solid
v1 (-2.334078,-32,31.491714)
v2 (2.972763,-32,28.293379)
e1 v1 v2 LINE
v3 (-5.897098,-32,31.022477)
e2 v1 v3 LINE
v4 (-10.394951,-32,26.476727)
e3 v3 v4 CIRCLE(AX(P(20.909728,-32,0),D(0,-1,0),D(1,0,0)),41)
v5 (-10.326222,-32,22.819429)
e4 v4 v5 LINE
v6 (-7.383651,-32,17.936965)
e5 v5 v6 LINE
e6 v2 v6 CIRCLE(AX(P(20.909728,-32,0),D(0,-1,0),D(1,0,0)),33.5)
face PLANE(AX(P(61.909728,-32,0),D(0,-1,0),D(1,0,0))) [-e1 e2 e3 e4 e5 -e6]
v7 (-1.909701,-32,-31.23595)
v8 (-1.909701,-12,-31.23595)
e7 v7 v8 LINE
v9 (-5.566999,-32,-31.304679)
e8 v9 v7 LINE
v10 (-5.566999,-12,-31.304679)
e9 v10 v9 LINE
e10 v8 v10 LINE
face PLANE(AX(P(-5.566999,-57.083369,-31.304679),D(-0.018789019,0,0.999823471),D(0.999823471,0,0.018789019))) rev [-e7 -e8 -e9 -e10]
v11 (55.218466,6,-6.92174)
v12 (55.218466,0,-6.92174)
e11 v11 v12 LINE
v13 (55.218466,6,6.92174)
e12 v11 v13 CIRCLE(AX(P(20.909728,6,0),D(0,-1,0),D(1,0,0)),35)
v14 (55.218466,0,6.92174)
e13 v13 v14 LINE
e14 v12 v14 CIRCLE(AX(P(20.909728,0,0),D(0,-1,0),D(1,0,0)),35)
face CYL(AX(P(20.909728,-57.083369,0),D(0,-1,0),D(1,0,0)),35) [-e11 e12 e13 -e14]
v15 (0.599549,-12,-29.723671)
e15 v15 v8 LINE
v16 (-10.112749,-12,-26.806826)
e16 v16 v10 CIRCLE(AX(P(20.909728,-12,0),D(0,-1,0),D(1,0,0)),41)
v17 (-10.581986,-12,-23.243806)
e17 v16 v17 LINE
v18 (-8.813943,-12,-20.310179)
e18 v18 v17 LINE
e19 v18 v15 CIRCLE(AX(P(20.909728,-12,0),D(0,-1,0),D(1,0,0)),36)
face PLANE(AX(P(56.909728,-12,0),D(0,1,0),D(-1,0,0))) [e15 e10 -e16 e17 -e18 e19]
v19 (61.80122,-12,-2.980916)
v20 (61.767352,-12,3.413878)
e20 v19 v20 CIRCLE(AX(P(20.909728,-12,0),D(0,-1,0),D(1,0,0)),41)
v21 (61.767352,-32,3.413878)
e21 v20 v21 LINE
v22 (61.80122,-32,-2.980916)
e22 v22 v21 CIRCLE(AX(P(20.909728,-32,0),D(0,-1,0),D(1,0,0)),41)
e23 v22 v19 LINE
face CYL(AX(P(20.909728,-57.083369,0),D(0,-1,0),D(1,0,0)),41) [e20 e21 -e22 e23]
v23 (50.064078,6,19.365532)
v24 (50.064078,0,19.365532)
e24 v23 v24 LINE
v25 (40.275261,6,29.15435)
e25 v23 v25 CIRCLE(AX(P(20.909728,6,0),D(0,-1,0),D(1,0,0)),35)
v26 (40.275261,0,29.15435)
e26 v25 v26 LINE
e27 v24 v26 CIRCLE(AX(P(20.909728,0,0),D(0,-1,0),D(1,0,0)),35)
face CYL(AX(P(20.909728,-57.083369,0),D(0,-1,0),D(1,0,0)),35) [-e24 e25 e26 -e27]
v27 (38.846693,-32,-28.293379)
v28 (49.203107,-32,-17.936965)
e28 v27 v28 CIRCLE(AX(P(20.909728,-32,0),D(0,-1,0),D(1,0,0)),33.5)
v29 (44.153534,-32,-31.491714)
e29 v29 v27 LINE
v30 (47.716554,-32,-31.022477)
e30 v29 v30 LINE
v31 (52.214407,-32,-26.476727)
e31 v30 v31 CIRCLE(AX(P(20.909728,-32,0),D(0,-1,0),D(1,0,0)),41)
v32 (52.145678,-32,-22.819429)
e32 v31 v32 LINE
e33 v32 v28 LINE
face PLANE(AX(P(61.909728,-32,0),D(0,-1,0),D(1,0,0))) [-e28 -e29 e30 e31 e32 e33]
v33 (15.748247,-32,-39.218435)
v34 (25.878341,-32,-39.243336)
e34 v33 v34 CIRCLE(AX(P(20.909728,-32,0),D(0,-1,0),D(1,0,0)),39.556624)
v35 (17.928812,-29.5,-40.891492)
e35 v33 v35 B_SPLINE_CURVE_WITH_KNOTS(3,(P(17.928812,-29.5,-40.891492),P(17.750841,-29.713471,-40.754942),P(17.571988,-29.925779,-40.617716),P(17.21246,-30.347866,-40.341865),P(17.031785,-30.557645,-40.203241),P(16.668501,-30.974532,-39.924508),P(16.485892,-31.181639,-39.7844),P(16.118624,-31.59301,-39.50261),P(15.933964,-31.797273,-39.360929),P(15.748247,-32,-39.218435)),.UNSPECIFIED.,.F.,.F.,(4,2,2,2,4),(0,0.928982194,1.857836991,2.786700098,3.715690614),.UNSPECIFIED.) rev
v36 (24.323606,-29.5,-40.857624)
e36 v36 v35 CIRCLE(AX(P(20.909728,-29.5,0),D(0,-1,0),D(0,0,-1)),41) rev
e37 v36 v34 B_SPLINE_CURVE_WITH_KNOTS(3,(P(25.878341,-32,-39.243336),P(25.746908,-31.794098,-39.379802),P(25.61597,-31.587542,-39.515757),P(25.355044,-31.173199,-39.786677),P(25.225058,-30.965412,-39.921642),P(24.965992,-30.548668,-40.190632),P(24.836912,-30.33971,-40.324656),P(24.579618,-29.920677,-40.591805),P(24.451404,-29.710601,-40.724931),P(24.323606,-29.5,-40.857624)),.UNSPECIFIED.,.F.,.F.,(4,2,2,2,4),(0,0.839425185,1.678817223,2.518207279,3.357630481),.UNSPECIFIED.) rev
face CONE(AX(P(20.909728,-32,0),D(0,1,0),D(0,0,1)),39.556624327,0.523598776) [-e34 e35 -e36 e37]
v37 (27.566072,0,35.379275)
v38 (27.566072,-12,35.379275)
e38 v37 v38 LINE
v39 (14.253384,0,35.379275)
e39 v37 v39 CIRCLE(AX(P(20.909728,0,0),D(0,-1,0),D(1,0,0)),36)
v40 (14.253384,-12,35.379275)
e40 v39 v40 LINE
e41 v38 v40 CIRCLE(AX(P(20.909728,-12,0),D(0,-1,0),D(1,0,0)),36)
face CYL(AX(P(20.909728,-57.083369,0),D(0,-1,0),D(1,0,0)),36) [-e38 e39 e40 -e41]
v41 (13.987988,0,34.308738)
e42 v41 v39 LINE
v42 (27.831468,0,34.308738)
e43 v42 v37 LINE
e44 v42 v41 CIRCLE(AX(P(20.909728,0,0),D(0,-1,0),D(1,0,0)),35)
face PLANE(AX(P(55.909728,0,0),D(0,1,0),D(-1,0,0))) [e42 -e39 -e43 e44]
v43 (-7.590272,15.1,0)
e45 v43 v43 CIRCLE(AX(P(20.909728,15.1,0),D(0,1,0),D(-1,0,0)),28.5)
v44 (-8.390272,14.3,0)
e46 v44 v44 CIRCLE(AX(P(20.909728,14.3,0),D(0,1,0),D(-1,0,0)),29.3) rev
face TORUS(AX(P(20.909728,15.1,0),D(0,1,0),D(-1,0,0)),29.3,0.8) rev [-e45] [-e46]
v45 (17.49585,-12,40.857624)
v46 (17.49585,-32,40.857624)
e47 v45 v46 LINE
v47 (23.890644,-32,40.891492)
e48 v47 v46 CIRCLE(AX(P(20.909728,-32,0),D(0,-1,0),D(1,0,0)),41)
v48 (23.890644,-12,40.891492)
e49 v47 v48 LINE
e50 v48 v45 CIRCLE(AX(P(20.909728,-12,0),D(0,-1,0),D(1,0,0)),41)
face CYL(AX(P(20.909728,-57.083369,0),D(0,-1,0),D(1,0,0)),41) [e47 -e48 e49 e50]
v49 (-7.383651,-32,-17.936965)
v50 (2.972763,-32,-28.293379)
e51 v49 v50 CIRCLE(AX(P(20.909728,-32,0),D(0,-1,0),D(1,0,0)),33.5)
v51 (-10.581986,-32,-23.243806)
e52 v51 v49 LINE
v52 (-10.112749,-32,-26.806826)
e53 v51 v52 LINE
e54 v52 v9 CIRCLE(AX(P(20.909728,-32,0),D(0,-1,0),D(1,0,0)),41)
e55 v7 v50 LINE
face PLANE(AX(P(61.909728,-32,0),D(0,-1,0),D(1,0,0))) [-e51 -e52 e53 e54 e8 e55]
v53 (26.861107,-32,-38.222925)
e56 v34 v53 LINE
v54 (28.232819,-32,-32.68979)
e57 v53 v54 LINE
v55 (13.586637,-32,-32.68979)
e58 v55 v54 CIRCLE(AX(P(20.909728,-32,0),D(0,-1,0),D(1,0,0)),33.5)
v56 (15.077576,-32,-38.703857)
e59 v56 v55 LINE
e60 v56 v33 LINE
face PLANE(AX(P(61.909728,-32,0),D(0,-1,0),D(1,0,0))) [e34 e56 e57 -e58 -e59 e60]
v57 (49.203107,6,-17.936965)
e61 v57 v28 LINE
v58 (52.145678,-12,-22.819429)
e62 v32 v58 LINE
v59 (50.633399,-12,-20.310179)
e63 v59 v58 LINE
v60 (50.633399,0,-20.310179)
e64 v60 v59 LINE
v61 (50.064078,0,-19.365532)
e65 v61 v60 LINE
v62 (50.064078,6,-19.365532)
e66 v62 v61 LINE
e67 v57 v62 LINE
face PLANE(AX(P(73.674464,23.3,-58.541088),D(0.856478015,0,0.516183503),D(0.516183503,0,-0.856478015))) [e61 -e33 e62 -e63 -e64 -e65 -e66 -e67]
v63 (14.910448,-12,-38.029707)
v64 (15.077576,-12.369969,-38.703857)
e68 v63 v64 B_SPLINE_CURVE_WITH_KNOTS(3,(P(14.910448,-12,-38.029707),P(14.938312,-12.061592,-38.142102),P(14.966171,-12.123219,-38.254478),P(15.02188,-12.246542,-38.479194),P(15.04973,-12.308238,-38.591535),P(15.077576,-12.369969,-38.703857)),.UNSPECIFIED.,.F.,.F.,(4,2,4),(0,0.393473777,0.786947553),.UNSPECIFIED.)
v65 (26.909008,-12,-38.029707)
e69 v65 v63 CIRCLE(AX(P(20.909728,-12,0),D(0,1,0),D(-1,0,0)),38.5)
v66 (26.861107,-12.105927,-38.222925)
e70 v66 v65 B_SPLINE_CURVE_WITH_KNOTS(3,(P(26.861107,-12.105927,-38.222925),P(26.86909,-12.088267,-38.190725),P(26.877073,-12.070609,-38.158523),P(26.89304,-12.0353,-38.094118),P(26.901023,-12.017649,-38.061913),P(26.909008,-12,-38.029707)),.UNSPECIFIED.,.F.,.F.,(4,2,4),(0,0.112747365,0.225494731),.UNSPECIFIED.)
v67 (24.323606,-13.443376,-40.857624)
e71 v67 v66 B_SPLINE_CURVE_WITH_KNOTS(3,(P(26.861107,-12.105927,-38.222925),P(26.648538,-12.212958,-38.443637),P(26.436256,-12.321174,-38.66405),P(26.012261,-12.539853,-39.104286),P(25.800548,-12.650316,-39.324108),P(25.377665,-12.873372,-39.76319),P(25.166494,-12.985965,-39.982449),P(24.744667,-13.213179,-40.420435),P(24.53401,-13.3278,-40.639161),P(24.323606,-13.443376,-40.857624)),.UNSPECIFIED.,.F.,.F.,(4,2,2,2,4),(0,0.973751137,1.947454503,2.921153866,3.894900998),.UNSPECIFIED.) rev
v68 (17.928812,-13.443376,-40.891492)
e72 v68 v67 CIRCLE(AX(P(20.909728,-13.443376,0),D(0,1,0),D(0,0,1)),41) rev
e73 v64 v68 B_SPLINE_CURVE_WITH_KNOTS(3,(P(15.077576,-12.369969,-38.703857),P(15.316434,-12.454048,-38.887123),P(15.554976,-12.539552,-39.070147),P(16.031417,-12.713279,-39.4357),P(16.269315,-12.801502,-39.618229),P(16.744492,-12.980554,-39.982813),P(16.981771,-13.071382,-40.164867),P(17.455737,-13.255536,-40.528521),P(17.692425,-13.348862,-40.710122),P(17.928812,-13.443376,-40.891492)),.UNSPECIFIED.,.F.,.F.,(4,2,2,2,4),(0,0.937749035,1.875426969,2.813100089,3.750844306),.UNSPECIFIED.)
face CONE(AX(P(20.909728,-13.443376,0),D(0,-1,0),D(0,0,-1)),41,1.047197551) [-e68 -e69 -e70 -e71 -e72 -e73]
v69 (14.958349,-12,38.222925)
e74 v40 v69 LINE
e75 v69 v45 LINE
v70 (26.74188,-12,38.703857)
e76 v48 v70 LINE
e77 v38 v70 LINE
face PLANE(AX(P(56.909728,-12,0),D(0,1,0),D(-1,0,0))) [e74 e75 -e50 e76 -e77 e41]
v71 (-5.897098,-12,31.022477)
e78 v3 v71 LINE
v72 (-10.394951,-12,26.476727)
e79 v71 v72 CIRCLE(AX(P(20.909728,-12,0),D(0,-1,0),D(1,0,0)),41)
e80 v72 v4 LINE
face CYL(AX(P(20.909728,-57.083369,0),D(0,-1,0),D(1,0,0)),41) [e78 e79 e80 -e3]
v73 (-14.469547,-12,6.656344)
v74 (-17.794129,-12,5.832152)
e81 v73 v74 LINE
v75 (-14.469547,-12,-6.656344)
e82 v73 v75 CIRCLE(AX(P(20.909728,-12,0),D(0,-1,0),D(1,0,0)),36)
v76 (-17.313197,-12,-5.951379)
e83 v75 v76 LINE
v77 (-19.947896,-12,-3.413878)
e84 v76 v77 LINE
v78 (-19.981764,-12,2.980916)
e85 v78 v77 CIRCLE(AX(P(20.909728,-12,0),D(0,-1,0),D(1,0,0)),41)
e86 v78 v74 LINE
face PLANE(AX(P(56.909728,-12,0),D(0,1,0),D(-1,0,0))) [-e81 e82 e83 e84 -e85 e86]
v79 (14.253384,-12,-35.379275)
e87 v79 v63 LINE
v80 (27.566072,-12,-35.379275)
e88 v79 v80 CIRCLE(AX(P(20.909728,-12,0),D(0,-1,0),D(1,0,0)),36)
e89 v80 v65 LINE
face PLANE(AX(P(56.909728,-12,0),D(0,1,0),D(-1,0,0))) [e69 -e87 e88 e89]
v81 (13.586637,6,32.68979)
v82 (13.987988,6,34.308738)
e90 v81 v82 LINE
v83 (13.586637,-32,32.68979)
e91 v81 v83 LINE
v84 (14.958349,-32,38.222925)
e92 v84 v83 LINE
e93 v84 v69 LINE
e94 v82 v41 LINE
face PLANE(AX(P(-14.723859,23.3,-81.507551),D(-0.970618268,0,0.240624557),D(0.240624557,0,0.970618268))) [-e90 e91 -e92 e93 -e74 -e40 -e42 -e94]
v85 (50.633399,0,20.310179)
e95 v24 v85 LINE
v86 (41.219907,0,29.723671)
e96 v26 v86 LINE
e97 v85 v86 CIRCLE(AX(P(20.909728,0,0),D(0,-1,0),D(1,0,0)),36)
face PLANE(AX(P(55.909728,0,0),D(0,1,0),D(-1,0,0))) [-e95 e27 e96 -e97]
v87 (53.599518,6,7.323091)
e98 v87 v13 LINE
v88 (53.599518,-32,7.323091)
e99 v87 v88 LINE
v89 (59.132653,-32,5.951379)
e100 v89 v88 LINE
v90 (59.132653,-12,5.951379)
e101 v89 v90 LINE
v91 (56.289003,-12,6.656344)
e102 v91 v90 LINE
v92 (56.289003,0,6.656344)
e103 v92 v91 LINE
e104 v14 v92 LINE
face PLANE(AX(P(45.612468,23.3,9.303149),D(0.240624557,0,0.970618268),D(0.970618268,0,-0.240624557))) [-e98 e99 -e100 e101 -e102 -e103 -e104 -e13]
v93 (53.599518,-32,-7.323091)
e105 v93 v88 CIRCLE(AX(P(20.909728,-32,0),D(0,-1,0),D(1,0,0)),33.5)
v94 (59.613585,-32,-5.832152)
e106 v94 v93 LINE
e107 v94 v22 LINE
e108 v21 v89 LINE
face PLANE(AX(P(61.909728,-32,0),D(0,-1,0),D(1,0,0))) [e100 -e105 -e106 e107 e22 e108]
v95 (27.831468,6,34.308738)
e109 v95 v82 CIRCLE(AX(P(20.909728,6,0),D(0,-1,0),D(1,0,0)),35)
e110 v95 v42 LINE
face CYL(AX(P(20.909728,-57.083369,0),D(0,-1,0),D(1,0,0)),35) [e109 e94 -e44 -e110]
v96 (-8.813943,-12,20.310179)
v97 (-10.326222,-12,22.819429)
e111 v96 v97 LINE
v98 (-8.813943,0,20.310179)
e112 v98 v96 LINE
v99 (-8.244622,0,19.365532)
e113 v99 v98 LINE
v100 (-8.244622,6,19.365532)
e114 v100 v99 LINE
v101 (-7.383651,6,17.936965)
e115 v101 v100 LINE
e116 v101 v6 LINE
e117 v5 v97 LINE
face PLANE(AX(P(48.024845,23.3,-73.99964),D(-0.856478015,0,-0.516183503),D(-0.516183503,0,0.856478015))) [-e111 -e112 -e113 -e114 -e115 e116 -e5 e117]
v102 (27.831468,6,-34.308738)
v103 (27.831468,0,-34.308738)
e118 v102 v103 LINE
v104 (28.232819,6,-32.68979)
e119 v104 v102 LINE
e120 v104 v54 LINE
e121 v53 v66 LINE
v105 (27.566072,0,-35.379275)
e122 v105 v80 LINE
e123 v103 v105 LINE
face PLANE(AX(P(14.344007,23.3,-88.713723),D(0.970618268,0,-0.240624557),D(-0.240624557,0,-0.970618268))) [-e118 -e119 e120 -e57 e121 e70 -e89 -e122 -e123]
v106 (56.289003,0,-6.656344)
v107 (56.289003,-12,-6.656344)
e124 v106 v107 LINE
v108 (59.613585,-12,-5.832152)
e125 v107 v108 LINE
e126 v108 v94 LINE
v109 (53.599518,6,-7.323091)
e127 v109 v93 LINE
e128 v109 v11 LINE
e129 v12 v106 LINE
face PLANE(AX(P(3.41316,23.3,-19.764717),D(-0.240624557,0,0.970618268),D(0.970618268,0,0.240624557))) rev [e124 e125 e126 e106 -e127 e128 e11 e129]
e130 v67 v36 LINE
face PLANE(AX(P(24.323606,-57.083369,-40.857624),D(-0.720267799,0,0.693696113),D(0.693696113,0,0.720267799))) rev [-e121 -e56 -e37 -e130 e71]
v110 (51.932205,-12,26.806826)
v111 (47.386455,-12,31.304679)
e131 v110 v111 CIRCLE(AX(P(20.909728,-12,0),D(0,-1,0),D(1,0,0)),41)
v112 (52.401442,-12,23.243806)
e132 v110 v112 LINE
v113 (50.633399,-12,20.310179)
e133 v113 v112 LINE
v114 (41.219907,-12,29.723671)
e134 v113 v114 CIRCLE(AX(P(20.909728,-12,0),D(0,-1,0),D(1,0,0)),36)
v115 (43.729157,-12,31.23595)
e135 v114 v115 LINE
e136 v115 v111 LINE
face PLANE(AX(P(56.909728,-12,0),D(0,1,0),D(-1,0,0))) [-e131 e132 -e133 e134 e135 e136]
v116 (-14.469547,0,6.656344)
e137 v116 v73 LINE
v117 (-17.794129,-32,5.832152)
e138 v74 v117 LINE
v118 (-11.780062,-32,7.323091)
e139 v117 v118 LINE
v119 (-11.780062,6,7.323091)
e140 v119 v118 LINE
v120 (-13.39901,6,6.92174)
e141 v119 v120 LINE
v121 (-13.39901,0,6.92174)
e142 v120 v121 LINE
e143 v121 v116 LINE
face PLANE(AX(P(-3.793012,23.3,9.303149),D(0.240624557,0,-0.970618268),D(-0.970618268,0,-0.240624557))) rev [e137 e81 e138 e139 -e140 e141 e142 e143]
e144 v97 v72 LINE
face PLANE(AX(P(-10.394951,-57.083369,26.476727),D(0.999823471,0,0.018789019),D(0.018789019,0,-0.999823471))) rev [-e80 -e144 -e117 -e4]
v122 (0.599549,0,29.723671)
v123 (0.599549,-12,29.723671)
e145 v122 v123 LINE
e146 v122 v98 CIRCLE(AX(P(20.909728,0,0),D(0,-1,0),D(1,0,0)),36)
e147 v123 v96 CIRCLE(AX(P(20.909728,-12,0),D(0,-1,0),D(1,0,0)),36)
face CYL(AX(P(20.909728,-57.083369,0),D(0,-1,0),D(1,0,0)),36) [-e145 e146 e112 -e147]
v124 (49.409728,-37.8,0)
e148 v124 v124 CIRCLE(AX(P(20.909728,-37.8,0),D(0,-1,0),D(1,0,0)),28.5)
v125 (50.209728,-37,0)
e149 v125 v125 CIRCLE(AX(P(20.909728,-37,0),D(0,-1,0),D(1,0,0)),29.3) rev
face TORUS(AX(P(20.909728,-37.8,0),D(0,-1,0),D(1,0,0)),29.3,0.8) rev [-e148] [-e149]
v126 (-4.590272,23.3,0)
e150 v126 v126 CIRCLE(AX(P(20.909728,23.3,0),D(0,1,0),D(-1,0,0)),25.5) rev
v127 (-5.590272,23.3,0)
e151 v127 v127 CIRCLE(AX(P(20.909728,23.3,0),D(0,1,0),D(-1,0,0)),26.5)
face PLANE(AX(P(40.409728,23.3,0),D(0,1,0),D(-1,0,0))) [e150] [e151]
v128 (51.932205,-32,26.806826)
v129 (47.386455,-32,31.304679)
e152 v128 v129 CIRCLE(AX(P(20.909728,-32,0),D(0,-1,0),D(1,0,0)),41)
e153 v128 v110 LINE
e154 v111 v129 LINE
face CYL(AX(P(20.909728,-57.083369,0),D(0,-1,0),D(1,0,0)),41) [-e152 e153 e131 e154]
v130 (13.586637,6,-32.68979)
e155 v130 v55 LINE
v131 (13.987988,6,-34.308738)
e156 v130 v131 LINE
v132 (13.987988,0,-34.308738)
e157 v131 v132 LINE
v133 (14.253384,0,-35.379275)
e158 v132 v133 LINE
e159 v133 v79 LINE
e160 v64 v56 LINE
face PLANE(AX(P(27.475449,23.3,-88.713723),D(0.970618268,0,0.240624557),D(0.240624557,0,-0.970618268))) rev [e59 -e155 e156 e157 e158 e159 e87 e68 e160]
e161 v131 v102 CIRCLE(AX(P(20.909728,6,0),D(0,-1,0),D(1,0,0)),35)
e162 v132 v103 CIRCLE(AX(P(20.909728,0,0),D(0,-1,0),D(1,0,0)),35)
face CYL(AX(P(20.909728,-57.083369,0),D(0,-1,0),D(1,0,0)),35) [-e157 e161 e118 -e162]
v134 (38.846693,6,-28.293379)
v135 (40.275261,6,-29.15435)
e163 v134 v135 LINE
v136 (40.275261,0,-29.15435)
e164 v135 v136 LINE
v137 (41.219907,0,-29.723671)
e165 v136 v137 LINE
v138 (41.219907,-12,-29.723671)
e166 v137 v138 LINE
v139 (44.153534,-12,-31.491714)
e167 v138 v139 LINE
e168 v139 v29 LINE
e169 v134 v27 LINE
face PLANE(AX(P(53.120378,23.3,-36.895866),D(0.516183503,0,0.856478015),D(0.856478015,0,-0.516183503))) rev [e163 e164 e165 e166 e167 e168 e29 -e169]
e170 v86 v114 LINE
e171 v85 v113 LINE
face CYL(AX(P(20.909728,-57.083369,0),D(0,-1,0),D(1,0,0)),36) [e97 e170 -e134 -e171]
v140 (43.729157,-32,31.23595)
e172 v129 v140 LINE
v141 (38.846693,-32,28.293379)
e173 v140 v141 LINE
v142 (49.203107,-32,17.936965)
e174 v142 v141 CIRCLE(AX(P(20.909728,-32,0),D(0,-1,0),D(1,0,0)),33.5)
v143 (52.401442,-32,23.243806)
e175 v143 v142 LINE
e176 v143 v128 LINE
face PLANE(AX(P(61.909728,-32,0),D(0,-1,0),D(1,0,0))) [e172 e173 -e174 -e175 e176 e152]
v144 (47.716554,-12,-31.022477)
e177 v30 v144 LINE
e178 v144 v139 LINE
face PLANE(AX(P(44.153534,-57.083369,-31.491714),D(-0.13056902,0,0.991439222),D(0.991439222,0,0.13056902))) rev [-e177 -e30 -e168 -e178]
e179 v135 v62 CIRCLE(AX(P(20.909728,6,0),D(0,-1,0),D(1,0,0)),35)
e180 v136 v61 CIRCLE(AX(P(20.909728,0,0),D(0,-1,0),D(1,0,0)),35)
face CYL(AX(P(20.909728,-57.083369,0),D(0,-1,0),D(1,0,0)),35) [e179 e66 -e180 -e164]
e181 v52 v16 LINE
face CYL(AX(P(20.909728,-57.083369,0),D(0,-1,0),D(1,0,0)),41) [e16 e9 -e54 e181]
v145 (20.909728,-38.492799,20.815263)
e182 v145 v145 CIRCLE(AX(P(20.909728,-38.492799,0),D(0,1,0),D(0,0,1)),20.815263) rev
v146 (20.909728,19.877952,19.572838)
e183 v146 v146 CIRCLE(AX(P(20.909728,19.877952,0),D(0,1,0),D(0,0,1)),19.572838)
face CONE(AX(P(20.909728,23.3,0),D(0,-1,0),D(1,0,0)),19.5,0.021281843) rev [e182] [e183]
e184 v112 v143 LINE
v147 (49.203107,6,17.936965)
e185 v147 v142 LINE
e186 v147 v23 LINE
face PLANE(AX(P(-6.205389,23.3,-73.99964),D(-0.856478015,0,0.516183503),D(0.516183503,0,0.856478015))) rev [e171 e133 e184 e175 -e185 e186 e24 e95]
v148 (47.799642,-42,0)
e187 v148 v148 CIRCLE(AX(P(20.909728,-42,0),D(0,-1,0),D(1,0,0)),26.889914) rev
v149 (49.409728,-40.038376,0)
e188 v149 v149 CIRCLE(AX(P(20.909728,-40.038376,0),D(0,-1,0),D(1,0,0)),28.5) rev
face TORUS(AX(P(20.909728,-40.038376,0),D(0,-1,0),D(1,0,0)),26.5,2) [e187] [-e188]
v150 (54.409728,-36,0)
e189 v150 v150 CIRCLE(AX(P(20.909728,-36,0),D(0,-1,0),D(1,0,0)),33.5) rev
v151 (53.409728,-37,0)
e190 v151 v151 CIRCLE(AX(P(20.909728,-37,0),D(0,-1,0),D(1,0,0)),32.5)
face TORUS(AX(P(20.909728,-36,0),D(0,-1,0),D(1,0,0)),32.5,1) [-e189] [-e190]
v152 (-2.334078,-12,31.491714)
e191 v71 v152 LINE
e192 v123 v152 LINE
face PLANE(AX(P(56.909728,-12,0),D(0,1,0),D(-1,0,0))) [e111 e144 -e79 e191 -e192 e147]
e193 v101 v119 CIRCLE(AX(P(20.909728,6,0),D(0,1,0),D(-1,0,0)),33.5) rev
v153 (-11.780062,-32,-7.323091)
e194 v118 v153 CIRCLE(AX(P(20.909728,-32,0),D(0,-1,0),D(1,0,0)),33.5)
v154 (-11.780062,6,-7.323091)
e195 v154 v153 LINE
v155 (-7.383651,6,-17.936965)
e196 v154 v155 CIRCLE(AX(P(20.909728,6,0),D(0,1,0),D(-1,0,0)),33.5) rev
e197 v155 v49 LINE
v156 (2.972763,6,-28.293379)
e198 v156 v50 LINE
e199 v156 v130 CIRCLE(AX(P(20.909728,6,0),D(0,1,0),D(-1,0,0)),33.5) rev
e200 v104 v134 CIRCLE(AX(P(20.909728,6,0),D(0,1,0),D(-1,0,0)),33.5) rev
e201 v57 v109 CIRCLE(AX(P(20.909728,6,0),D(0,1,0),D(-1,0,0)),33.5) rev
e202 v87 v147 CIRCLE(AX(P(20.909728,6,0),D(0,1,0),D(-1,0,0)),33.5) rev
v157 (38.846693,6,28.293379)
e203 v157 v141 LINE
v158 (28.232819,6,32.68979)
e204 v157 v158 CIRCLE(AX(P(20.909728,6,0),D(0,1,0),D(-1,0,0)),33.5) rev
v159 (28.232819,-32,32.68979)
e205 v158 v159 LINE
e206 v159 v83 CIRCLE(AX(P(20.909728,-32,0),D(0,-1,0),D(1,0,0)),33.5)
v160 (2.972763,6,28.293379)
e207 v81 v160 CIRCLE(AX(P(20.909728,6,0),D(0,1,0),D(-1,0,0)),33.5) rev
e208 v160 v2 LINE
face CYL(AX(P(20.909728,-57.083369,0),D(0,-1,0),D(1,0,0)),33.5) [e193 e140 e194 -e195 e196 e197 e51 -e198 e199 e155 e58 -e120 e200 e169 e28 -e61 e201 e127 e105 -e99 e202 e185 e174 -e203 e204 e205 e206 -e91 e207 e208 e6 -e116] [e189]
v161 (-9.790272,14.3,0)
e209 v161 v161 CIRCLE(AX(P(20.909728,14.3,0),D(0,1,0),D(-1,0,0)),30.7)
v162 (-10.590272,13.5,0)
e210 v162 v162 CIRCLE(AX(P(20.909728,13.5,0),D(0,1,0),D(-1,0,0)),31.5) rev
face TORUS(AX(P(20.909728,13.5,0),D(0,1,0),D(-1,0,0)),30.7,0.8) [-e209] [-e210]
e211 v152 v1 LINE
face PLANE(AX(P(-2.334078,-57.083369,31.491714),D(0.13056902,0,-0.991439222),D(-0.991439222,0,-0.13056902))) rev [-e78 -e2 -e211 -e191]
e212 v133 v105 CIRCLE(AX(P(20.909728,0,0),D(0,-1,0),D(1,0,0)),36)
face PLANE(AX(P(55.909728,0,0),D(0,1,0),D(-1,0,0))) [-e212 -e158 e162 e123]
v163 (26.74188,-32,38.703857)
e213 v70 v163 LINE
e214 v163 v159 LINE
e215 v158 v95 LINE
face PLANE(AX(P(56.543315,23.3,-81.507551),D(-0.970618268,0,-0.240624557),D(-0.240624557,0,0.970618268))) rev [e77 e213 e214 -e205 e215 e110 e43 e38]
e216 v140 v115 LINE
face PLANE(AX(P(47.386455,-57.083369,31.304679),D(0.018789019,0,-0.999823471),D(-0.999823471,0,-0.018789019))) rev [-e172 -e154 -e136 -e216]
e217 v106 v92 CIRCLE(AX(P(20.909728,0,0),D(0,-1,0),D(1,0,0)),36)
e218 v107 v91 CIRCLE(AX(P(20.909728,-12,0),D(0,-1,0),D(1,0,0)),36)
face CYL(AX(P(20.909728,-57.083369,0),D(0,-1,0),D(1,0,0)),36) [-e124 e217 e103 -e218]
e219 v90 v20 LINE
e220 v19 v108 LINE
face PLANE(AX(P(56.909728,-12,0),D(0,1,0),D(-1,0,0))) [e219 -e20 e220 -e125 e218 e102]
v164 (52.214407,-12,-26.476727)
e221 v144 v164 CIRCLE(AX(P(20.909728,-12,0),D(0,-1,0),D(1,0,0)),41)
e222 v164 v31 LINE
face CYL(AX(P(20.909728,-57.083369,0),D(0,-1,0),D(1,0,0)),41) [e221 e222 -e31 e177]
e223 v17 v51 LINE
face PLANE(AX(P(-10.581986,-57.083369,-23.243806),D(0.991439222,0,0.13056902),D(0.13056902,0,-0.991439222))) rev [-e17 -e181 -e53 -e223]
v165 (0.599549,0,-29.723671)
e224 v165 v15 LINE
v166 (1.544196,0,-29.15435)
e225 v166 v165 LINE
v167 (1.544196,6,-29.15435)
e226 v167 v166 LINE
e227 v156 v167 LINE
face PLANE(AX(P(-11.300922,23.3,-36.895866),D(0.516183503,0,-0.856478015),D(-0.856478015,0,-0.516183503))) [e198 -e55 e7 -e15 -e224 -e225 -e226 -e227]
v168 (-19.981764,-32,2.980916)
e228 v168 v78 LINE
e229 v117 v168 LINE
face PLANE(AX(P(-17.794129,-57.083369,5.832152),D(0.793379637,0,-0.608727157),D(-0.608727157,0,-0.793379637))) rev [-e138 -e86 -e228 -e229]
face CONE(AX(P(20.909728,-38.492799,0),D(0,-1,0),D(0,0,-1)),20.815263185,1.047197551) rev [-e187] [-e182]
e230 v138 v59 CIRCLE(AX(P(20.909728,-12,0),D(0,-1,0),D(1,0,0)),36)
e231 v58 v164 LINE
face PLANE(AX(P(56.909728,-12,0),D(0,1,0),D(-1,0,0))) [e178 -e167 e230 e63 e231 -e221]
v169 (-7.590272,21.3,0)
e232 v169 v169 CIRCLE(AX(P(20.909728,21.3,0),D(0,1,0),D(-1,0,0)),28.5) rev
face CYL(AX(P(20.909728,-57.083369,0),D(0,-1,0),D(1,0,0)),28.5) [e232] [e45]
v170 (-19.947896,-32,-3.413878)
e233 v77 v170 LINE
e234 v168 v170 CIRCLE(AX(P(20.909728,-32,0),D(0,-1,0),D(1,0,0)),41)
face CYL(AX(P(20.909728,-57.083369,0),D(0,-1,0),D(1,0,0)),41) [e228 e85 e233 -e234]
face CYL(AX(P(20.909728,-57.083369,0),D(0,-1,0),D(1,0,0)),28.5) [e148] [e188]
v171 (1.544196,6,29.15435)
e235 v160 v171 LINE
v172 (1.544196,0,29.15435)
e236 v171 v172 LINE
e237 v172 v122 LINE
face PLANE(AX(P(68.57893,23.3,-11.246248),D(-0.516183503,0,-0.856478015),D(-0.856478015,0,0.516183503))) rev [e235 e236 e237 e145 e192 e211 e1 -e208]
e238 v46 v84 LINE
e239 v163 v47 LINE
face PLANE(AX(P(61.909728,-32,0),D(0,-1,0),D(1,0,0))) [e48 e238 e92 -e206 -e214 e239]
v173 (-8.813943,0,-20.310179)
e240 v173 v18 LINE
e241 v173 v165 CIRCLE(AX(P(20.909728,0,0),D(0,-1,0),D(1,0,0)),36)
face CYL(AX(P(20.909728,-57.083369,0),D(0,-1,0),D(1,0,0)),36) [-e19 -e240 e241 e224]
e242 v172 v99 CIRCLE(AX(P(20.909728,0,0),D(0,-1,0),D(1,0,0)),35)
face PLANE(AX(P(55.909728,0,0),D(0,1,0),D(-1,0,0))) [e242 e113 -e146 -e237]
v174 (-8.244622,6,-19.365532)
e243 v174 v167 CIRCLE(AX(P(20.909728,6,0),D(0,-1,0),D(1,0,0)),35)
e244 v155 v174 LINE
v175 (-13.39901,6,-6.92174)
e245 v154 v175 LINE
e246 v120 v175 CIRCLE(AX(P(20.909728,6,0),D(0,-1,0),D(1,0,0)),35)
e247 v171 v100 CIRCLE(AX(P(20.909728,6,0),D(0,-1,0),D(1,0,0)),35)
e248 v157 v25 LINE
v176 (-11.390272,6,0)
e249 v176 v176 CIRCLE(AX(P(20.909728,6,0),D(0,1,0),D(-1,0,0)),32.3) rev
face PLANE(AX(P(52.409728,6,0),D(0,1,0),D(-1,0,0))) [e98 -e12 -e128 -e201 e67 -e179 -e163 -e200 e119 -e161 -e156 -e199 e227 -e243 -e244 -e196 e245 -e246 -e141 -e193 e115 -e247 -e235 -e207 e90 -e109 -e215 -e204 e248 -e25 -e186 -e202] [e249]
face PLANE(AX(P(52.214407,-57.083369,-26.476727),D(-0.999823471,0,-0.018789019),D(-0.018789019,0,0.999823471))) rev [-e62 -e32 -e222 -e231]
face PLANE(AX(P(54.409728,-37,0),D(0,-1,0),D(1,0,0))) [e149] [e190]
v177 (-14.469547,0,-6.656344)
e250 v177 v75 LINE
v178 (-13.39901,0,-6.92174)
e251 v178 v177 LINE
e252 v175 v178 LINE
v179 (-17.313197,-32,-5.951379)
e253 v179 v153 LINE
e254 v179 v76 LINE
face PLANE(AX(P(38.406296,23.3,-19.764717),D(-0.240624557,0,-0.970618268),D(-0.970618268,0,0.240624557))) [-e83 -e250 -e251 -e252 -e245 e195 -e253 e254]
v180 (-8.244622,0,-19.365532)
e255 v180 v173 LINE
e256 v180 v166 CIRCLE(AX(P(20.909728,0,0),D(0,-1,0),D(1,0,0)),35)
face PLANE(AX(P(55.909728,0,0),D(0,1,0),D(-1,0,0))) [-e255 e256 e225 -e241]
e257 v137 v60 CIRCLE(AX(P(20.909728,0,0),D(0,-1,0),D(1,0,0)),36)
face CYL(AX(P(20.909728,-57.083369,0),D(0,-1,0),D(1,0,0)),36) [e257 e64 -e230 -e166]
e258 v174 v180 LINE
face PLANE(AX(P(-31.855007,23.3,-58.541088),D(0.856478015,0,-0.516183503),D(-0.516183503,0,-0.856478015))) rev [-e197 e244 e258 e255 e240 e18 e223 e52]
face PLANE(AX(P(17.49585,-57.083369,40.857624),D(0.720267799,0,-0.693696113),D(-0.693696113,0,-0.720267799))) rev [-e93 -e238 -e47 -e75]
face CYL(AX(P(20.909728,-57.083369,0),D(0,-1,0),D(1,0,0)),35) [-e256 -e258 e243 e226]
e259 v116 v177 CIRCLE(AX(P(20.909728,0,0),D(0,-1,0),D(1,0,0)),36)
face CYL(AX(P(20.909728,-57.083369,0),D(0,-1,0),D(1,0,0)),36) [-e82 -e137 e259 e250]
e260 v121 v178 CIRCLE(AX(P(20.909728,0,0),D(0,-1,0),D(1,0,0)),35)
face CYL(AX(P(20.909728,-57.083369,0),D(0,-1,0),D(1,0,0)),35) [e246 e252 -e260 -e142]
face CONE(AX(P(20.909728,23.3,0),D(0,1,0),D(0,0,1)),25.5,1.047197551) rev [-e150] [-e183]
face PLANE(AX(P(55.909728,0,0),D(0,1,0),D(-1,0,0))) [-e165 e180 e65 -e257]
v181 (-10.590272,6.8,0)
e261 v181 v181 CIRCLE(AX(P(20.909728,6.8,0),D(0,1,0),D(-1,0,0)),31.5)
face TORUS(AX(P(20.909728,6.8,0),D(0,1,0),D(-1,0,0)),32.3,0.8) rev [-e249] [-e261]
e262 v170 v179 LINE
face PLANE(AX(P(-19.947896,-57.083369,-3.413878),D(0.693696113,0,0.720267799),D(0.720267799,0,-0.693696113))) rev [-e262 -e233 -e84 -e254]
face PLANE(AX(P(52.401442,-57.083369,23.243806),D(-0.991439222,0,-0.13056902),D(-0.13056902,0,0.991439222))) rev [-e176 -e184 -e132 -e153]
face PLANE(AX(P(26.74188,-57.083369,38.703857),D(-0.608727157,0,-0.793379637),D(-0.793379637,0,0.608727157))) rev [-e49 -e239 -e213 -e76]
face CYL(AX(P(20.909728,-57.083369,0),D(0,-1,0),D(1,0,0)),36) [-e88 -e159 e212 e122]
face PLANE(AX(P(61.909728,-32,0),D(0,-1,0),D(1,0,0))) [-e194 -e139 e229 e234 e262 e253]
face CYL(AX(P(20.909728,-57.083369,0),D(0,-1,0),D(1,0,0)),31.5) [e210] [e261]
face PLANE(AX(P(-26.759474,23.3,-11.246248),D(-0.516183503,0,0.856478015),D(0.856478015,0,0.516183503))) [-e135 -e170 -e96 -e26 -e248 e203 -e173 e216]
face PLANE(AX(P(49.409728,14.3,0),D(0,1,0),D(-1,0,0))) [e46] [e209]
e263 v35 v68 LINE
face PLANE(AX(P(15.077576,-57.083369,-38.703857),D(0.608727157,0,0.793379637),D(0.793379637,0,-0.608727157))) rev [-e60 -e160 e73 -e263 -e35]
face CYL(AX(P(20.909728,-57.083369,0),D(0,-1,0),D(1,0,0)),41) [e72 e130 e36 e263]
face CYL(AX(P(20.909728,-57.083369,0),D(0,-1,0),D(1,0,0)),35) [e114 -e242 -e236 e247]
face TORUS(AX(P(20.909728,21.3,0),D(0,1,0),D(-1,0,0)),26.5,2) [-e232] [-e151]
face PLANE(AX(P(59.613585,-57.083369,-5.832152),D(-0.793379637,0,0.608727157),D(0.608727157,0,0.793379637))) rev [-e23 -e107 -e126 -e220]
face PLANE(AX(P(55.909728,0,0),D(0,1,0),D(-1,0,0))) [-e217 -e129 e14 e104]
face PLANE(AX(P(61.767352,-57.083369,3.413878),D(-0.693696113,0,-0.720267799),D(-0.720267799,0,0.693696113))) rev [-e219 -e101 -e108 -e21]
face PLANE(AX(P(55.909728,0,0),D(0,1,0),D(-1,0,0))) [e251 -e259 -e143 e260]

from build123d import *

# Parameters (mm, degrees)
CORTE_EXTRUS_O3_DEPTH = 93.584579839
CHANFRO1_SIZE         = 2.5
CHANFRO1_SIZE_2       = 1.443375673
CHANFRO1_SIZE_3       = 2.004509131
CHANFRO2_SIZE         = 6
CHANFRO2_SIZE2        = 3.422823391
CHANFRO3_SIZE         = 6
CHANFRO3_SIZE2        = 3.507995763
FILETE2_R             = 2
FILETE3_R             = 2
FILETE4_R             = 1
FILETE5_R             = 0.8
FILETE6_R             = 0.8


with BuildPart() as part:
    # Esboço1 → Revolução1 (revolve)
    with BuildSketch(Plane.XY):
        Polygon((40.409728023, 23.3), (49.409728023, 23.3), (49.409728023, 14.3), (52.409728023, 14.3), (52.409728023, 6), (55.909728023, 6), (55.909728023, 0), (56.909728023, 0), (56.909728023, -12), (61.909728023, -12), (61.909728023, -32), (54.409728023, -32), (54.409728023, -37), (49.409728023, -37), (49.409728023, -42), (41.799642187, -42), align=None)
    revolve(axis=Axis((20.909728023, -57.083369099, 0), (0, 1, 0)))

    # Esboço2 → Corte-extrusão3 (cut, through all)
    with BuildSketch(Plane.XZ.offset(32)):
        with BuildLine():
            ThreePointArc((-11.616680712, 24.960623686), (-16.96933281, 15.690020727), (-19.739742432, 5.349817913))
            Line((-19.739742432, 5.349817913), (-11.780061536, 7.323090779))
            ThreePointArc((-11.780061536, 7.323090779), (-10.040236316, 12.819894984), (-7.383650999, 17.936964724))
            Line((-7.383650999, 17.936964724), (-11.616680712, 24.960623686))
        make_face()
        with BuildLine():
            ThreePointArc((15.55991011, 40.649470455), (5.219707296, 37.879060833), (-4.050895663, 32.526408735))
            Line((-4.050895663, 32.526408735), (2.972763299, 28.293379022))
            ThreePointArc((2.972763299, 28.293379022), (8.089833039, 30.949964339), (13.586637245, 32.68978956))
            Line((13.586637245, 32.68978956), (15.55991011, 40.649470455))
        make_face()
        with BuildLine():
            ThreePointArc((45.870351709, 32.526408735), (36.59974875, 37.879060833), (26.259545937, 40.649470455))
            Line((26.259545937, 40.649470455), (28.232818802, 32.68978956))
            ThreePointArc((28.232818802, 32.68978956), (33.729623008, 30.949964339), (38.846692748, 28.293379022))
            Line((38.846692748, 28.293379022), (45.870351709, 32.526408735))
        make_face()
        with BuildLine():
            ThreePointArc((61.559198479, 5.349817913), (58.788788856, 15.690020727), (53.436136759, 24.960623686))
            Line((53.436136759, 24.960623686), (49.203107045, 17.936964724))
            ThreePointArc((49.203107045, 17.936964724), (51.859692363, 12.819894984), (53.599517583, 7.323090779))
            Line((53.599517583, 7.323090779), (61.559198479, 5.349817913))
        make_face()
        with BuildLine():
            Line((49.203107045, -17.936964724), (53.436136759, -24.960623686))
            ThreePointArc((53.436136759, -24.960623686), (58.788788856, -15.690020727), (61.559198479, -5.349817913))
            Line((61.559198479, -5.349817913), (53.599517583, -7.323090779))
            ThreePointArc((53.599517583, -7.323090779), (51.859692363, -12.819894984), (49.203107045, -17.936964724))
        make_face()
        with BuildLine():
            Line((28.232818802, -32.68978956), (26.259545937, -40.649470455))
            ThreePointArc((26.259545937, -40.649470455), (36.59974875, -37.879060833), (45.870351709, -32.526408735))
            Line((45.870351709, -32.526408735), (38.846692748, -28.293379022))
            ThreePointArc((38.846692748, -28.293379022), (33.729623008, -30.949964339), (28.232818802, -32.68978956))
        make_face()
        with BuildLine():
            Line((2.972763299, -28.293379022), (-4.050895663, -32.526408735))
            ThreePointArc((-4.050895663, -32.526408735), (5.219707296, -37.879060833), (15.55991011, -40.649470455))
            Line((15.55991011, -40.649470455), (13.586637245, -32.68978956))
            ThreePointArc((13.586637245, -32.68978956), (8.089833039, -30.949964339), (2.972763299, -28.293379022))
        make_face()
        with BuildLine():
            Line((-11.780061536, -7.323090779), (-19.739742432, -5.349817913))
            ThreePointArc((-19.739742432, -5.349817913), (-16.96933281, -15.690020727), (-11.616680712, -24.960623686))
            Line((-11.616680712, -24.960623686), (-7.383650999, -17.936964724))
            ThreePointArc((-7.383650999, -17.936964724), (-10.040236316, -12.819894984), (-11.780061536, -7.323090779))
        make_face()
    extrude(amount=-CORTE_EXTRUS_O3_DEPTH, mode=Mode.SUBTRACT)

    # Chanfro1
    # the kernel refuses this chamfer: 2.5, 2.004509131, 1.443375673 mm, written as the material it takes off along each edge
    with BuildSketch(Plane(origin=(20.909728023, -32, 0), x_dir=(0.284617484383171, 0, -0.9586411672692736), z_dir=(0.9586411672692736, 0, 0.284617484383171))) as chanfro1_piece_1:
        Polygon((41, CHANFRO1_SIZE), (41 - CHANFRO1_SIZE_2, 0), (41, 0), align=None)
    revolve(axis=Axis((20.909728023, -32, 0), (0, 1, 0)), revolution_arc=33.071970304, mode=Mode.SUBTRACT)
    with BuildSketch(Plane(origin=(26.259545937, -38.467714387, -40.649470455), x_dir=(0.24062455724554768, 0, 0.9706182681416955), z_dir=(0, 1, 0)), Plane(origin=(-4.050895663, -38.467714387, -32.526408735), x_dir=(0.8564780154949562, 0, 0.5161835031980602), z_dir=(0, 1, 0)), Plane(origin=(53.436136759, -38.467714387, -24.960623686), x_dir=(-0.5161835031980546, 0, 0.8564780154949595), z_dir=(0, 1, 0))) as chanfro1_piece_2:
        with BuildLine():
            Line((CHANFRO1_SIZE, 0), (-0.667872347, -1.828971953))
            ThreePointArc((-0.667872347, -1.828971953), (-0.357921183, -0.946519102), (0, 0))
            Line((0, 0), (CHANFRO1_SIZE, 0))
        make_face()
    extrude(amount=32.935428773, mode=Mode.SUBTRACT)
    with BuildSketch(Plane(origin=(20.909728023, -12, 0), x_dir=(0.2846174843831778, 0, -0.9586411672692715), z_dir=(0.9586411672692715, 0, 0.2846174843831778))) as chanfro1_piece_3:
        Polygon((41 - CHANFRO1_SIZE, 0), (41, -CHANFRO1_SIZE_2), (41, 0), align=None)
    revolve(axis=Axis((20.909728023, -12, 0), (0, 1, 0)), revolution_arc=33.071970304, mode=Mode.SUBTRACT)
    with BuildSketch(Plane(origin=(15.55991011, -38.167265311, -40.649470455), x_dir=(0.9948215341489756, 0, -0.10163717426945043), z_dir=(0, 1, 0)), Plane(origin=(53.436136759, -38.167265311, 24.960623686), x_dir=(-0.6315767177206731, 0, 0.7753133880136348), z_dir=(0, 1, 0)), Plane(origin=(26.259545937, -38.167265311, 40.649470455), x_dir=(-0.9948215341489772, 0, 0.10163717426943392), z_dir=(0, 1, 0)), Plane(origin=(-4.050895663, -38.167265311, 32.526408735), x_dir=(-0.7753133880136321, 0, -0.6315767177206766), z_dir=(0, 1, 0)), Plane(origin=(-19.739742432, -38.167265311, 5.349817913), x_dir=(-0.10163717426943429, 0, -0.9948215341489772), z_dir=(0, 1, 0)), Plane(origin=(-11.616680712, -38.167265311, -24.960623686), x_dir=(0.6315767177206676, 0, -0.7753133880136395), z_dir=(0, 1, 0)), Plane(origin=(61.559198479, -38.167265311, -5.349817913), x_dir=(0.10163717426943941, 0, 0.9948215341489767), z_dir=(0, 1, 0)), Plane(origin=(45.870351709, -38.167265311, -32.526408735), x_dir=(0.775313388013634, 0, 0.631576717720674), z_dir=(0, 1, 0))) as chanfro1_piece_4:
        with BuildLine():
            Line((2.381233502, 0), (-CHANFRO1_SIZE_3 * 0.338029389256, -CHANFRO1_SIZE_3 * 0.941135554513))
            Line((-CHANFRO1_SIZE_3 * 0.338029389256, -CHANFRO1_SIZE_3 * 0.941135554513), (0, 0))
            ThreePointArc((0, 0), (1.233164457, 0.017268987), (2.381233502, 0))
        make_face()
    extrude(amount=32.334530622, mode=Mode.SUBTRACT)
    with BuildSketch(Plane(origin=(45.870351709, -38.467714387, 32.526408735), x_dir=(0.7786474443812702, 0, -0.6274616779999529), z_dir=(0, 1, 0)), Plane(origin=(15.55991011, -38.467714387, 40.649470455), x_dir=(0.994269295524013, 0, 0.10690448062725404), z_dir=(0, 1, 0)), Plane(origin=(-11.616680712, -38.467714387, 24.960623686), x_dir=(0.6274616779999497, 0, 0.7786474443812729), z_dir=(0, 1, 0)), Plane(origin=(-19.739742432, -38.467714387, -5.349817913), x_dir=(-0.10690448062725709, 0, 0.9942692955240126), z_dir=(0, 1, 0)), Plane(origin=(61.559198479, -38.467714387, 5.349817913), x_dir=(0.10690448062725047, 0, -0.9942692955240133), z_dir=(0, 1, 0))) as chanfro1_piece_5:
        with BuildLine():
            Line((1.947098322, 0), (-CHANFRO1_SIZE * 0.343009050861, CHANFRO1_SIZE * 0.939332098369))
            Line((-CHANFRO1_SIZE * 0.343009050861, CHANFRO1_SIZE * 0.939332098369), (0, 0))
            ThreePointArc((0, 0), (1.01186598, -0.011542237), (1.947098322, 0))
        make_face()
    extrude(amount=32.935428773, mode=Mode.SUBTRACT)

    # Chanfro2
    chanfro2_edges = [part.edges().sort_by_distance(p)[0] for p in [
        (1.409728023, 23.3, 0),
    ]]
    chanfro2_side = [part.faces().sort_by_distance(p)[0] for p in [
        (0.603626293, 23.3, 0),
    ]]
    chamfer(chanfro2_edges, length=CHANFRO2_SIZE, length2=CHANFRO2_SIZE2, reference=chanfro2_side[0])

    # Chanfro3
    chanfro3_edges = [part.edges().sort_by_distance(p)[0] for p in [
        (0.01981386, -42, 0),
    ]]
    chanfro3_side = [part.faces().sort_by_distance(p)[0] for p in [
        (-6.784170246, -42, 0),
    ]]
    chamfer(chanfro3_edges, length=CHANFRO3_SIZE, length2=CHANFRO3_SIZE2, reference=chanfro3_side[0])

    # Filete2
    filete2_edges = [part.edges().sort_by_distance(p)[0] for p in [
        (-7.590271977, 23.3, 0),
    ]]
    fillet(filete2_edges, radius=FILETE2_R)

    # Filete3
    # the kernel refuses this fillet: 2 mm, written as the material it takes off along each edge
    with BuildSketch(Plane(origin=(20.909728023, -42, 0), x_dir=(1, 0, 0), z_dir=(0, 0, 1))) as filete3_piece_1:
        with BuildLine():
            CenterArc((26.5, 1.961623548), FILETE3_R, 281.242216427, 78.757783573)
            Line((28.5, 1.961623548), (28.54, 1.961623548))
            Line((28.54, 1.961623548), (28.54, 0))
            Line((28.54, 0), (28.5, -0.04))
            ThreePointArc((28.5, -0.04), (27.694957082, -0.04), (26.897712446, -0.039232471))
            Line((26.897712446, -0.039232471), (26.889914163, 0))
        make_face()
    revolve(axis=Axis((20.909728023, -42, 0), (0, 1, 0)), mode=Mode.SUBTRACT)

    # Filete4
    filete4_edges = [part.edges().sort_by_distance(p)[0] for p in [
        (-12.590271977, -37, 0),
    ]]
    fillet(filete4_edges, radius=FILETE4_R)

    # Filete5
    filete5_edges = [part.edges().sort_by_distance(p)[0] for p in [
        (-7.590271977, -37, 0),
    ]]
    fillet(filete5_edges, radius=FILETE5_R)

    # Filete6
    filete6_edges = [part.edges().sort_by_distance(p)[0] for p in [
        (-10.590271977, 6, 0),
        (-10.590271977, 14.3, 0),
        (-7.590271977, 14.3, 0),
    ]]
    fillet(filete6_edges, radius=FILETE6_R)


solid = part.part
